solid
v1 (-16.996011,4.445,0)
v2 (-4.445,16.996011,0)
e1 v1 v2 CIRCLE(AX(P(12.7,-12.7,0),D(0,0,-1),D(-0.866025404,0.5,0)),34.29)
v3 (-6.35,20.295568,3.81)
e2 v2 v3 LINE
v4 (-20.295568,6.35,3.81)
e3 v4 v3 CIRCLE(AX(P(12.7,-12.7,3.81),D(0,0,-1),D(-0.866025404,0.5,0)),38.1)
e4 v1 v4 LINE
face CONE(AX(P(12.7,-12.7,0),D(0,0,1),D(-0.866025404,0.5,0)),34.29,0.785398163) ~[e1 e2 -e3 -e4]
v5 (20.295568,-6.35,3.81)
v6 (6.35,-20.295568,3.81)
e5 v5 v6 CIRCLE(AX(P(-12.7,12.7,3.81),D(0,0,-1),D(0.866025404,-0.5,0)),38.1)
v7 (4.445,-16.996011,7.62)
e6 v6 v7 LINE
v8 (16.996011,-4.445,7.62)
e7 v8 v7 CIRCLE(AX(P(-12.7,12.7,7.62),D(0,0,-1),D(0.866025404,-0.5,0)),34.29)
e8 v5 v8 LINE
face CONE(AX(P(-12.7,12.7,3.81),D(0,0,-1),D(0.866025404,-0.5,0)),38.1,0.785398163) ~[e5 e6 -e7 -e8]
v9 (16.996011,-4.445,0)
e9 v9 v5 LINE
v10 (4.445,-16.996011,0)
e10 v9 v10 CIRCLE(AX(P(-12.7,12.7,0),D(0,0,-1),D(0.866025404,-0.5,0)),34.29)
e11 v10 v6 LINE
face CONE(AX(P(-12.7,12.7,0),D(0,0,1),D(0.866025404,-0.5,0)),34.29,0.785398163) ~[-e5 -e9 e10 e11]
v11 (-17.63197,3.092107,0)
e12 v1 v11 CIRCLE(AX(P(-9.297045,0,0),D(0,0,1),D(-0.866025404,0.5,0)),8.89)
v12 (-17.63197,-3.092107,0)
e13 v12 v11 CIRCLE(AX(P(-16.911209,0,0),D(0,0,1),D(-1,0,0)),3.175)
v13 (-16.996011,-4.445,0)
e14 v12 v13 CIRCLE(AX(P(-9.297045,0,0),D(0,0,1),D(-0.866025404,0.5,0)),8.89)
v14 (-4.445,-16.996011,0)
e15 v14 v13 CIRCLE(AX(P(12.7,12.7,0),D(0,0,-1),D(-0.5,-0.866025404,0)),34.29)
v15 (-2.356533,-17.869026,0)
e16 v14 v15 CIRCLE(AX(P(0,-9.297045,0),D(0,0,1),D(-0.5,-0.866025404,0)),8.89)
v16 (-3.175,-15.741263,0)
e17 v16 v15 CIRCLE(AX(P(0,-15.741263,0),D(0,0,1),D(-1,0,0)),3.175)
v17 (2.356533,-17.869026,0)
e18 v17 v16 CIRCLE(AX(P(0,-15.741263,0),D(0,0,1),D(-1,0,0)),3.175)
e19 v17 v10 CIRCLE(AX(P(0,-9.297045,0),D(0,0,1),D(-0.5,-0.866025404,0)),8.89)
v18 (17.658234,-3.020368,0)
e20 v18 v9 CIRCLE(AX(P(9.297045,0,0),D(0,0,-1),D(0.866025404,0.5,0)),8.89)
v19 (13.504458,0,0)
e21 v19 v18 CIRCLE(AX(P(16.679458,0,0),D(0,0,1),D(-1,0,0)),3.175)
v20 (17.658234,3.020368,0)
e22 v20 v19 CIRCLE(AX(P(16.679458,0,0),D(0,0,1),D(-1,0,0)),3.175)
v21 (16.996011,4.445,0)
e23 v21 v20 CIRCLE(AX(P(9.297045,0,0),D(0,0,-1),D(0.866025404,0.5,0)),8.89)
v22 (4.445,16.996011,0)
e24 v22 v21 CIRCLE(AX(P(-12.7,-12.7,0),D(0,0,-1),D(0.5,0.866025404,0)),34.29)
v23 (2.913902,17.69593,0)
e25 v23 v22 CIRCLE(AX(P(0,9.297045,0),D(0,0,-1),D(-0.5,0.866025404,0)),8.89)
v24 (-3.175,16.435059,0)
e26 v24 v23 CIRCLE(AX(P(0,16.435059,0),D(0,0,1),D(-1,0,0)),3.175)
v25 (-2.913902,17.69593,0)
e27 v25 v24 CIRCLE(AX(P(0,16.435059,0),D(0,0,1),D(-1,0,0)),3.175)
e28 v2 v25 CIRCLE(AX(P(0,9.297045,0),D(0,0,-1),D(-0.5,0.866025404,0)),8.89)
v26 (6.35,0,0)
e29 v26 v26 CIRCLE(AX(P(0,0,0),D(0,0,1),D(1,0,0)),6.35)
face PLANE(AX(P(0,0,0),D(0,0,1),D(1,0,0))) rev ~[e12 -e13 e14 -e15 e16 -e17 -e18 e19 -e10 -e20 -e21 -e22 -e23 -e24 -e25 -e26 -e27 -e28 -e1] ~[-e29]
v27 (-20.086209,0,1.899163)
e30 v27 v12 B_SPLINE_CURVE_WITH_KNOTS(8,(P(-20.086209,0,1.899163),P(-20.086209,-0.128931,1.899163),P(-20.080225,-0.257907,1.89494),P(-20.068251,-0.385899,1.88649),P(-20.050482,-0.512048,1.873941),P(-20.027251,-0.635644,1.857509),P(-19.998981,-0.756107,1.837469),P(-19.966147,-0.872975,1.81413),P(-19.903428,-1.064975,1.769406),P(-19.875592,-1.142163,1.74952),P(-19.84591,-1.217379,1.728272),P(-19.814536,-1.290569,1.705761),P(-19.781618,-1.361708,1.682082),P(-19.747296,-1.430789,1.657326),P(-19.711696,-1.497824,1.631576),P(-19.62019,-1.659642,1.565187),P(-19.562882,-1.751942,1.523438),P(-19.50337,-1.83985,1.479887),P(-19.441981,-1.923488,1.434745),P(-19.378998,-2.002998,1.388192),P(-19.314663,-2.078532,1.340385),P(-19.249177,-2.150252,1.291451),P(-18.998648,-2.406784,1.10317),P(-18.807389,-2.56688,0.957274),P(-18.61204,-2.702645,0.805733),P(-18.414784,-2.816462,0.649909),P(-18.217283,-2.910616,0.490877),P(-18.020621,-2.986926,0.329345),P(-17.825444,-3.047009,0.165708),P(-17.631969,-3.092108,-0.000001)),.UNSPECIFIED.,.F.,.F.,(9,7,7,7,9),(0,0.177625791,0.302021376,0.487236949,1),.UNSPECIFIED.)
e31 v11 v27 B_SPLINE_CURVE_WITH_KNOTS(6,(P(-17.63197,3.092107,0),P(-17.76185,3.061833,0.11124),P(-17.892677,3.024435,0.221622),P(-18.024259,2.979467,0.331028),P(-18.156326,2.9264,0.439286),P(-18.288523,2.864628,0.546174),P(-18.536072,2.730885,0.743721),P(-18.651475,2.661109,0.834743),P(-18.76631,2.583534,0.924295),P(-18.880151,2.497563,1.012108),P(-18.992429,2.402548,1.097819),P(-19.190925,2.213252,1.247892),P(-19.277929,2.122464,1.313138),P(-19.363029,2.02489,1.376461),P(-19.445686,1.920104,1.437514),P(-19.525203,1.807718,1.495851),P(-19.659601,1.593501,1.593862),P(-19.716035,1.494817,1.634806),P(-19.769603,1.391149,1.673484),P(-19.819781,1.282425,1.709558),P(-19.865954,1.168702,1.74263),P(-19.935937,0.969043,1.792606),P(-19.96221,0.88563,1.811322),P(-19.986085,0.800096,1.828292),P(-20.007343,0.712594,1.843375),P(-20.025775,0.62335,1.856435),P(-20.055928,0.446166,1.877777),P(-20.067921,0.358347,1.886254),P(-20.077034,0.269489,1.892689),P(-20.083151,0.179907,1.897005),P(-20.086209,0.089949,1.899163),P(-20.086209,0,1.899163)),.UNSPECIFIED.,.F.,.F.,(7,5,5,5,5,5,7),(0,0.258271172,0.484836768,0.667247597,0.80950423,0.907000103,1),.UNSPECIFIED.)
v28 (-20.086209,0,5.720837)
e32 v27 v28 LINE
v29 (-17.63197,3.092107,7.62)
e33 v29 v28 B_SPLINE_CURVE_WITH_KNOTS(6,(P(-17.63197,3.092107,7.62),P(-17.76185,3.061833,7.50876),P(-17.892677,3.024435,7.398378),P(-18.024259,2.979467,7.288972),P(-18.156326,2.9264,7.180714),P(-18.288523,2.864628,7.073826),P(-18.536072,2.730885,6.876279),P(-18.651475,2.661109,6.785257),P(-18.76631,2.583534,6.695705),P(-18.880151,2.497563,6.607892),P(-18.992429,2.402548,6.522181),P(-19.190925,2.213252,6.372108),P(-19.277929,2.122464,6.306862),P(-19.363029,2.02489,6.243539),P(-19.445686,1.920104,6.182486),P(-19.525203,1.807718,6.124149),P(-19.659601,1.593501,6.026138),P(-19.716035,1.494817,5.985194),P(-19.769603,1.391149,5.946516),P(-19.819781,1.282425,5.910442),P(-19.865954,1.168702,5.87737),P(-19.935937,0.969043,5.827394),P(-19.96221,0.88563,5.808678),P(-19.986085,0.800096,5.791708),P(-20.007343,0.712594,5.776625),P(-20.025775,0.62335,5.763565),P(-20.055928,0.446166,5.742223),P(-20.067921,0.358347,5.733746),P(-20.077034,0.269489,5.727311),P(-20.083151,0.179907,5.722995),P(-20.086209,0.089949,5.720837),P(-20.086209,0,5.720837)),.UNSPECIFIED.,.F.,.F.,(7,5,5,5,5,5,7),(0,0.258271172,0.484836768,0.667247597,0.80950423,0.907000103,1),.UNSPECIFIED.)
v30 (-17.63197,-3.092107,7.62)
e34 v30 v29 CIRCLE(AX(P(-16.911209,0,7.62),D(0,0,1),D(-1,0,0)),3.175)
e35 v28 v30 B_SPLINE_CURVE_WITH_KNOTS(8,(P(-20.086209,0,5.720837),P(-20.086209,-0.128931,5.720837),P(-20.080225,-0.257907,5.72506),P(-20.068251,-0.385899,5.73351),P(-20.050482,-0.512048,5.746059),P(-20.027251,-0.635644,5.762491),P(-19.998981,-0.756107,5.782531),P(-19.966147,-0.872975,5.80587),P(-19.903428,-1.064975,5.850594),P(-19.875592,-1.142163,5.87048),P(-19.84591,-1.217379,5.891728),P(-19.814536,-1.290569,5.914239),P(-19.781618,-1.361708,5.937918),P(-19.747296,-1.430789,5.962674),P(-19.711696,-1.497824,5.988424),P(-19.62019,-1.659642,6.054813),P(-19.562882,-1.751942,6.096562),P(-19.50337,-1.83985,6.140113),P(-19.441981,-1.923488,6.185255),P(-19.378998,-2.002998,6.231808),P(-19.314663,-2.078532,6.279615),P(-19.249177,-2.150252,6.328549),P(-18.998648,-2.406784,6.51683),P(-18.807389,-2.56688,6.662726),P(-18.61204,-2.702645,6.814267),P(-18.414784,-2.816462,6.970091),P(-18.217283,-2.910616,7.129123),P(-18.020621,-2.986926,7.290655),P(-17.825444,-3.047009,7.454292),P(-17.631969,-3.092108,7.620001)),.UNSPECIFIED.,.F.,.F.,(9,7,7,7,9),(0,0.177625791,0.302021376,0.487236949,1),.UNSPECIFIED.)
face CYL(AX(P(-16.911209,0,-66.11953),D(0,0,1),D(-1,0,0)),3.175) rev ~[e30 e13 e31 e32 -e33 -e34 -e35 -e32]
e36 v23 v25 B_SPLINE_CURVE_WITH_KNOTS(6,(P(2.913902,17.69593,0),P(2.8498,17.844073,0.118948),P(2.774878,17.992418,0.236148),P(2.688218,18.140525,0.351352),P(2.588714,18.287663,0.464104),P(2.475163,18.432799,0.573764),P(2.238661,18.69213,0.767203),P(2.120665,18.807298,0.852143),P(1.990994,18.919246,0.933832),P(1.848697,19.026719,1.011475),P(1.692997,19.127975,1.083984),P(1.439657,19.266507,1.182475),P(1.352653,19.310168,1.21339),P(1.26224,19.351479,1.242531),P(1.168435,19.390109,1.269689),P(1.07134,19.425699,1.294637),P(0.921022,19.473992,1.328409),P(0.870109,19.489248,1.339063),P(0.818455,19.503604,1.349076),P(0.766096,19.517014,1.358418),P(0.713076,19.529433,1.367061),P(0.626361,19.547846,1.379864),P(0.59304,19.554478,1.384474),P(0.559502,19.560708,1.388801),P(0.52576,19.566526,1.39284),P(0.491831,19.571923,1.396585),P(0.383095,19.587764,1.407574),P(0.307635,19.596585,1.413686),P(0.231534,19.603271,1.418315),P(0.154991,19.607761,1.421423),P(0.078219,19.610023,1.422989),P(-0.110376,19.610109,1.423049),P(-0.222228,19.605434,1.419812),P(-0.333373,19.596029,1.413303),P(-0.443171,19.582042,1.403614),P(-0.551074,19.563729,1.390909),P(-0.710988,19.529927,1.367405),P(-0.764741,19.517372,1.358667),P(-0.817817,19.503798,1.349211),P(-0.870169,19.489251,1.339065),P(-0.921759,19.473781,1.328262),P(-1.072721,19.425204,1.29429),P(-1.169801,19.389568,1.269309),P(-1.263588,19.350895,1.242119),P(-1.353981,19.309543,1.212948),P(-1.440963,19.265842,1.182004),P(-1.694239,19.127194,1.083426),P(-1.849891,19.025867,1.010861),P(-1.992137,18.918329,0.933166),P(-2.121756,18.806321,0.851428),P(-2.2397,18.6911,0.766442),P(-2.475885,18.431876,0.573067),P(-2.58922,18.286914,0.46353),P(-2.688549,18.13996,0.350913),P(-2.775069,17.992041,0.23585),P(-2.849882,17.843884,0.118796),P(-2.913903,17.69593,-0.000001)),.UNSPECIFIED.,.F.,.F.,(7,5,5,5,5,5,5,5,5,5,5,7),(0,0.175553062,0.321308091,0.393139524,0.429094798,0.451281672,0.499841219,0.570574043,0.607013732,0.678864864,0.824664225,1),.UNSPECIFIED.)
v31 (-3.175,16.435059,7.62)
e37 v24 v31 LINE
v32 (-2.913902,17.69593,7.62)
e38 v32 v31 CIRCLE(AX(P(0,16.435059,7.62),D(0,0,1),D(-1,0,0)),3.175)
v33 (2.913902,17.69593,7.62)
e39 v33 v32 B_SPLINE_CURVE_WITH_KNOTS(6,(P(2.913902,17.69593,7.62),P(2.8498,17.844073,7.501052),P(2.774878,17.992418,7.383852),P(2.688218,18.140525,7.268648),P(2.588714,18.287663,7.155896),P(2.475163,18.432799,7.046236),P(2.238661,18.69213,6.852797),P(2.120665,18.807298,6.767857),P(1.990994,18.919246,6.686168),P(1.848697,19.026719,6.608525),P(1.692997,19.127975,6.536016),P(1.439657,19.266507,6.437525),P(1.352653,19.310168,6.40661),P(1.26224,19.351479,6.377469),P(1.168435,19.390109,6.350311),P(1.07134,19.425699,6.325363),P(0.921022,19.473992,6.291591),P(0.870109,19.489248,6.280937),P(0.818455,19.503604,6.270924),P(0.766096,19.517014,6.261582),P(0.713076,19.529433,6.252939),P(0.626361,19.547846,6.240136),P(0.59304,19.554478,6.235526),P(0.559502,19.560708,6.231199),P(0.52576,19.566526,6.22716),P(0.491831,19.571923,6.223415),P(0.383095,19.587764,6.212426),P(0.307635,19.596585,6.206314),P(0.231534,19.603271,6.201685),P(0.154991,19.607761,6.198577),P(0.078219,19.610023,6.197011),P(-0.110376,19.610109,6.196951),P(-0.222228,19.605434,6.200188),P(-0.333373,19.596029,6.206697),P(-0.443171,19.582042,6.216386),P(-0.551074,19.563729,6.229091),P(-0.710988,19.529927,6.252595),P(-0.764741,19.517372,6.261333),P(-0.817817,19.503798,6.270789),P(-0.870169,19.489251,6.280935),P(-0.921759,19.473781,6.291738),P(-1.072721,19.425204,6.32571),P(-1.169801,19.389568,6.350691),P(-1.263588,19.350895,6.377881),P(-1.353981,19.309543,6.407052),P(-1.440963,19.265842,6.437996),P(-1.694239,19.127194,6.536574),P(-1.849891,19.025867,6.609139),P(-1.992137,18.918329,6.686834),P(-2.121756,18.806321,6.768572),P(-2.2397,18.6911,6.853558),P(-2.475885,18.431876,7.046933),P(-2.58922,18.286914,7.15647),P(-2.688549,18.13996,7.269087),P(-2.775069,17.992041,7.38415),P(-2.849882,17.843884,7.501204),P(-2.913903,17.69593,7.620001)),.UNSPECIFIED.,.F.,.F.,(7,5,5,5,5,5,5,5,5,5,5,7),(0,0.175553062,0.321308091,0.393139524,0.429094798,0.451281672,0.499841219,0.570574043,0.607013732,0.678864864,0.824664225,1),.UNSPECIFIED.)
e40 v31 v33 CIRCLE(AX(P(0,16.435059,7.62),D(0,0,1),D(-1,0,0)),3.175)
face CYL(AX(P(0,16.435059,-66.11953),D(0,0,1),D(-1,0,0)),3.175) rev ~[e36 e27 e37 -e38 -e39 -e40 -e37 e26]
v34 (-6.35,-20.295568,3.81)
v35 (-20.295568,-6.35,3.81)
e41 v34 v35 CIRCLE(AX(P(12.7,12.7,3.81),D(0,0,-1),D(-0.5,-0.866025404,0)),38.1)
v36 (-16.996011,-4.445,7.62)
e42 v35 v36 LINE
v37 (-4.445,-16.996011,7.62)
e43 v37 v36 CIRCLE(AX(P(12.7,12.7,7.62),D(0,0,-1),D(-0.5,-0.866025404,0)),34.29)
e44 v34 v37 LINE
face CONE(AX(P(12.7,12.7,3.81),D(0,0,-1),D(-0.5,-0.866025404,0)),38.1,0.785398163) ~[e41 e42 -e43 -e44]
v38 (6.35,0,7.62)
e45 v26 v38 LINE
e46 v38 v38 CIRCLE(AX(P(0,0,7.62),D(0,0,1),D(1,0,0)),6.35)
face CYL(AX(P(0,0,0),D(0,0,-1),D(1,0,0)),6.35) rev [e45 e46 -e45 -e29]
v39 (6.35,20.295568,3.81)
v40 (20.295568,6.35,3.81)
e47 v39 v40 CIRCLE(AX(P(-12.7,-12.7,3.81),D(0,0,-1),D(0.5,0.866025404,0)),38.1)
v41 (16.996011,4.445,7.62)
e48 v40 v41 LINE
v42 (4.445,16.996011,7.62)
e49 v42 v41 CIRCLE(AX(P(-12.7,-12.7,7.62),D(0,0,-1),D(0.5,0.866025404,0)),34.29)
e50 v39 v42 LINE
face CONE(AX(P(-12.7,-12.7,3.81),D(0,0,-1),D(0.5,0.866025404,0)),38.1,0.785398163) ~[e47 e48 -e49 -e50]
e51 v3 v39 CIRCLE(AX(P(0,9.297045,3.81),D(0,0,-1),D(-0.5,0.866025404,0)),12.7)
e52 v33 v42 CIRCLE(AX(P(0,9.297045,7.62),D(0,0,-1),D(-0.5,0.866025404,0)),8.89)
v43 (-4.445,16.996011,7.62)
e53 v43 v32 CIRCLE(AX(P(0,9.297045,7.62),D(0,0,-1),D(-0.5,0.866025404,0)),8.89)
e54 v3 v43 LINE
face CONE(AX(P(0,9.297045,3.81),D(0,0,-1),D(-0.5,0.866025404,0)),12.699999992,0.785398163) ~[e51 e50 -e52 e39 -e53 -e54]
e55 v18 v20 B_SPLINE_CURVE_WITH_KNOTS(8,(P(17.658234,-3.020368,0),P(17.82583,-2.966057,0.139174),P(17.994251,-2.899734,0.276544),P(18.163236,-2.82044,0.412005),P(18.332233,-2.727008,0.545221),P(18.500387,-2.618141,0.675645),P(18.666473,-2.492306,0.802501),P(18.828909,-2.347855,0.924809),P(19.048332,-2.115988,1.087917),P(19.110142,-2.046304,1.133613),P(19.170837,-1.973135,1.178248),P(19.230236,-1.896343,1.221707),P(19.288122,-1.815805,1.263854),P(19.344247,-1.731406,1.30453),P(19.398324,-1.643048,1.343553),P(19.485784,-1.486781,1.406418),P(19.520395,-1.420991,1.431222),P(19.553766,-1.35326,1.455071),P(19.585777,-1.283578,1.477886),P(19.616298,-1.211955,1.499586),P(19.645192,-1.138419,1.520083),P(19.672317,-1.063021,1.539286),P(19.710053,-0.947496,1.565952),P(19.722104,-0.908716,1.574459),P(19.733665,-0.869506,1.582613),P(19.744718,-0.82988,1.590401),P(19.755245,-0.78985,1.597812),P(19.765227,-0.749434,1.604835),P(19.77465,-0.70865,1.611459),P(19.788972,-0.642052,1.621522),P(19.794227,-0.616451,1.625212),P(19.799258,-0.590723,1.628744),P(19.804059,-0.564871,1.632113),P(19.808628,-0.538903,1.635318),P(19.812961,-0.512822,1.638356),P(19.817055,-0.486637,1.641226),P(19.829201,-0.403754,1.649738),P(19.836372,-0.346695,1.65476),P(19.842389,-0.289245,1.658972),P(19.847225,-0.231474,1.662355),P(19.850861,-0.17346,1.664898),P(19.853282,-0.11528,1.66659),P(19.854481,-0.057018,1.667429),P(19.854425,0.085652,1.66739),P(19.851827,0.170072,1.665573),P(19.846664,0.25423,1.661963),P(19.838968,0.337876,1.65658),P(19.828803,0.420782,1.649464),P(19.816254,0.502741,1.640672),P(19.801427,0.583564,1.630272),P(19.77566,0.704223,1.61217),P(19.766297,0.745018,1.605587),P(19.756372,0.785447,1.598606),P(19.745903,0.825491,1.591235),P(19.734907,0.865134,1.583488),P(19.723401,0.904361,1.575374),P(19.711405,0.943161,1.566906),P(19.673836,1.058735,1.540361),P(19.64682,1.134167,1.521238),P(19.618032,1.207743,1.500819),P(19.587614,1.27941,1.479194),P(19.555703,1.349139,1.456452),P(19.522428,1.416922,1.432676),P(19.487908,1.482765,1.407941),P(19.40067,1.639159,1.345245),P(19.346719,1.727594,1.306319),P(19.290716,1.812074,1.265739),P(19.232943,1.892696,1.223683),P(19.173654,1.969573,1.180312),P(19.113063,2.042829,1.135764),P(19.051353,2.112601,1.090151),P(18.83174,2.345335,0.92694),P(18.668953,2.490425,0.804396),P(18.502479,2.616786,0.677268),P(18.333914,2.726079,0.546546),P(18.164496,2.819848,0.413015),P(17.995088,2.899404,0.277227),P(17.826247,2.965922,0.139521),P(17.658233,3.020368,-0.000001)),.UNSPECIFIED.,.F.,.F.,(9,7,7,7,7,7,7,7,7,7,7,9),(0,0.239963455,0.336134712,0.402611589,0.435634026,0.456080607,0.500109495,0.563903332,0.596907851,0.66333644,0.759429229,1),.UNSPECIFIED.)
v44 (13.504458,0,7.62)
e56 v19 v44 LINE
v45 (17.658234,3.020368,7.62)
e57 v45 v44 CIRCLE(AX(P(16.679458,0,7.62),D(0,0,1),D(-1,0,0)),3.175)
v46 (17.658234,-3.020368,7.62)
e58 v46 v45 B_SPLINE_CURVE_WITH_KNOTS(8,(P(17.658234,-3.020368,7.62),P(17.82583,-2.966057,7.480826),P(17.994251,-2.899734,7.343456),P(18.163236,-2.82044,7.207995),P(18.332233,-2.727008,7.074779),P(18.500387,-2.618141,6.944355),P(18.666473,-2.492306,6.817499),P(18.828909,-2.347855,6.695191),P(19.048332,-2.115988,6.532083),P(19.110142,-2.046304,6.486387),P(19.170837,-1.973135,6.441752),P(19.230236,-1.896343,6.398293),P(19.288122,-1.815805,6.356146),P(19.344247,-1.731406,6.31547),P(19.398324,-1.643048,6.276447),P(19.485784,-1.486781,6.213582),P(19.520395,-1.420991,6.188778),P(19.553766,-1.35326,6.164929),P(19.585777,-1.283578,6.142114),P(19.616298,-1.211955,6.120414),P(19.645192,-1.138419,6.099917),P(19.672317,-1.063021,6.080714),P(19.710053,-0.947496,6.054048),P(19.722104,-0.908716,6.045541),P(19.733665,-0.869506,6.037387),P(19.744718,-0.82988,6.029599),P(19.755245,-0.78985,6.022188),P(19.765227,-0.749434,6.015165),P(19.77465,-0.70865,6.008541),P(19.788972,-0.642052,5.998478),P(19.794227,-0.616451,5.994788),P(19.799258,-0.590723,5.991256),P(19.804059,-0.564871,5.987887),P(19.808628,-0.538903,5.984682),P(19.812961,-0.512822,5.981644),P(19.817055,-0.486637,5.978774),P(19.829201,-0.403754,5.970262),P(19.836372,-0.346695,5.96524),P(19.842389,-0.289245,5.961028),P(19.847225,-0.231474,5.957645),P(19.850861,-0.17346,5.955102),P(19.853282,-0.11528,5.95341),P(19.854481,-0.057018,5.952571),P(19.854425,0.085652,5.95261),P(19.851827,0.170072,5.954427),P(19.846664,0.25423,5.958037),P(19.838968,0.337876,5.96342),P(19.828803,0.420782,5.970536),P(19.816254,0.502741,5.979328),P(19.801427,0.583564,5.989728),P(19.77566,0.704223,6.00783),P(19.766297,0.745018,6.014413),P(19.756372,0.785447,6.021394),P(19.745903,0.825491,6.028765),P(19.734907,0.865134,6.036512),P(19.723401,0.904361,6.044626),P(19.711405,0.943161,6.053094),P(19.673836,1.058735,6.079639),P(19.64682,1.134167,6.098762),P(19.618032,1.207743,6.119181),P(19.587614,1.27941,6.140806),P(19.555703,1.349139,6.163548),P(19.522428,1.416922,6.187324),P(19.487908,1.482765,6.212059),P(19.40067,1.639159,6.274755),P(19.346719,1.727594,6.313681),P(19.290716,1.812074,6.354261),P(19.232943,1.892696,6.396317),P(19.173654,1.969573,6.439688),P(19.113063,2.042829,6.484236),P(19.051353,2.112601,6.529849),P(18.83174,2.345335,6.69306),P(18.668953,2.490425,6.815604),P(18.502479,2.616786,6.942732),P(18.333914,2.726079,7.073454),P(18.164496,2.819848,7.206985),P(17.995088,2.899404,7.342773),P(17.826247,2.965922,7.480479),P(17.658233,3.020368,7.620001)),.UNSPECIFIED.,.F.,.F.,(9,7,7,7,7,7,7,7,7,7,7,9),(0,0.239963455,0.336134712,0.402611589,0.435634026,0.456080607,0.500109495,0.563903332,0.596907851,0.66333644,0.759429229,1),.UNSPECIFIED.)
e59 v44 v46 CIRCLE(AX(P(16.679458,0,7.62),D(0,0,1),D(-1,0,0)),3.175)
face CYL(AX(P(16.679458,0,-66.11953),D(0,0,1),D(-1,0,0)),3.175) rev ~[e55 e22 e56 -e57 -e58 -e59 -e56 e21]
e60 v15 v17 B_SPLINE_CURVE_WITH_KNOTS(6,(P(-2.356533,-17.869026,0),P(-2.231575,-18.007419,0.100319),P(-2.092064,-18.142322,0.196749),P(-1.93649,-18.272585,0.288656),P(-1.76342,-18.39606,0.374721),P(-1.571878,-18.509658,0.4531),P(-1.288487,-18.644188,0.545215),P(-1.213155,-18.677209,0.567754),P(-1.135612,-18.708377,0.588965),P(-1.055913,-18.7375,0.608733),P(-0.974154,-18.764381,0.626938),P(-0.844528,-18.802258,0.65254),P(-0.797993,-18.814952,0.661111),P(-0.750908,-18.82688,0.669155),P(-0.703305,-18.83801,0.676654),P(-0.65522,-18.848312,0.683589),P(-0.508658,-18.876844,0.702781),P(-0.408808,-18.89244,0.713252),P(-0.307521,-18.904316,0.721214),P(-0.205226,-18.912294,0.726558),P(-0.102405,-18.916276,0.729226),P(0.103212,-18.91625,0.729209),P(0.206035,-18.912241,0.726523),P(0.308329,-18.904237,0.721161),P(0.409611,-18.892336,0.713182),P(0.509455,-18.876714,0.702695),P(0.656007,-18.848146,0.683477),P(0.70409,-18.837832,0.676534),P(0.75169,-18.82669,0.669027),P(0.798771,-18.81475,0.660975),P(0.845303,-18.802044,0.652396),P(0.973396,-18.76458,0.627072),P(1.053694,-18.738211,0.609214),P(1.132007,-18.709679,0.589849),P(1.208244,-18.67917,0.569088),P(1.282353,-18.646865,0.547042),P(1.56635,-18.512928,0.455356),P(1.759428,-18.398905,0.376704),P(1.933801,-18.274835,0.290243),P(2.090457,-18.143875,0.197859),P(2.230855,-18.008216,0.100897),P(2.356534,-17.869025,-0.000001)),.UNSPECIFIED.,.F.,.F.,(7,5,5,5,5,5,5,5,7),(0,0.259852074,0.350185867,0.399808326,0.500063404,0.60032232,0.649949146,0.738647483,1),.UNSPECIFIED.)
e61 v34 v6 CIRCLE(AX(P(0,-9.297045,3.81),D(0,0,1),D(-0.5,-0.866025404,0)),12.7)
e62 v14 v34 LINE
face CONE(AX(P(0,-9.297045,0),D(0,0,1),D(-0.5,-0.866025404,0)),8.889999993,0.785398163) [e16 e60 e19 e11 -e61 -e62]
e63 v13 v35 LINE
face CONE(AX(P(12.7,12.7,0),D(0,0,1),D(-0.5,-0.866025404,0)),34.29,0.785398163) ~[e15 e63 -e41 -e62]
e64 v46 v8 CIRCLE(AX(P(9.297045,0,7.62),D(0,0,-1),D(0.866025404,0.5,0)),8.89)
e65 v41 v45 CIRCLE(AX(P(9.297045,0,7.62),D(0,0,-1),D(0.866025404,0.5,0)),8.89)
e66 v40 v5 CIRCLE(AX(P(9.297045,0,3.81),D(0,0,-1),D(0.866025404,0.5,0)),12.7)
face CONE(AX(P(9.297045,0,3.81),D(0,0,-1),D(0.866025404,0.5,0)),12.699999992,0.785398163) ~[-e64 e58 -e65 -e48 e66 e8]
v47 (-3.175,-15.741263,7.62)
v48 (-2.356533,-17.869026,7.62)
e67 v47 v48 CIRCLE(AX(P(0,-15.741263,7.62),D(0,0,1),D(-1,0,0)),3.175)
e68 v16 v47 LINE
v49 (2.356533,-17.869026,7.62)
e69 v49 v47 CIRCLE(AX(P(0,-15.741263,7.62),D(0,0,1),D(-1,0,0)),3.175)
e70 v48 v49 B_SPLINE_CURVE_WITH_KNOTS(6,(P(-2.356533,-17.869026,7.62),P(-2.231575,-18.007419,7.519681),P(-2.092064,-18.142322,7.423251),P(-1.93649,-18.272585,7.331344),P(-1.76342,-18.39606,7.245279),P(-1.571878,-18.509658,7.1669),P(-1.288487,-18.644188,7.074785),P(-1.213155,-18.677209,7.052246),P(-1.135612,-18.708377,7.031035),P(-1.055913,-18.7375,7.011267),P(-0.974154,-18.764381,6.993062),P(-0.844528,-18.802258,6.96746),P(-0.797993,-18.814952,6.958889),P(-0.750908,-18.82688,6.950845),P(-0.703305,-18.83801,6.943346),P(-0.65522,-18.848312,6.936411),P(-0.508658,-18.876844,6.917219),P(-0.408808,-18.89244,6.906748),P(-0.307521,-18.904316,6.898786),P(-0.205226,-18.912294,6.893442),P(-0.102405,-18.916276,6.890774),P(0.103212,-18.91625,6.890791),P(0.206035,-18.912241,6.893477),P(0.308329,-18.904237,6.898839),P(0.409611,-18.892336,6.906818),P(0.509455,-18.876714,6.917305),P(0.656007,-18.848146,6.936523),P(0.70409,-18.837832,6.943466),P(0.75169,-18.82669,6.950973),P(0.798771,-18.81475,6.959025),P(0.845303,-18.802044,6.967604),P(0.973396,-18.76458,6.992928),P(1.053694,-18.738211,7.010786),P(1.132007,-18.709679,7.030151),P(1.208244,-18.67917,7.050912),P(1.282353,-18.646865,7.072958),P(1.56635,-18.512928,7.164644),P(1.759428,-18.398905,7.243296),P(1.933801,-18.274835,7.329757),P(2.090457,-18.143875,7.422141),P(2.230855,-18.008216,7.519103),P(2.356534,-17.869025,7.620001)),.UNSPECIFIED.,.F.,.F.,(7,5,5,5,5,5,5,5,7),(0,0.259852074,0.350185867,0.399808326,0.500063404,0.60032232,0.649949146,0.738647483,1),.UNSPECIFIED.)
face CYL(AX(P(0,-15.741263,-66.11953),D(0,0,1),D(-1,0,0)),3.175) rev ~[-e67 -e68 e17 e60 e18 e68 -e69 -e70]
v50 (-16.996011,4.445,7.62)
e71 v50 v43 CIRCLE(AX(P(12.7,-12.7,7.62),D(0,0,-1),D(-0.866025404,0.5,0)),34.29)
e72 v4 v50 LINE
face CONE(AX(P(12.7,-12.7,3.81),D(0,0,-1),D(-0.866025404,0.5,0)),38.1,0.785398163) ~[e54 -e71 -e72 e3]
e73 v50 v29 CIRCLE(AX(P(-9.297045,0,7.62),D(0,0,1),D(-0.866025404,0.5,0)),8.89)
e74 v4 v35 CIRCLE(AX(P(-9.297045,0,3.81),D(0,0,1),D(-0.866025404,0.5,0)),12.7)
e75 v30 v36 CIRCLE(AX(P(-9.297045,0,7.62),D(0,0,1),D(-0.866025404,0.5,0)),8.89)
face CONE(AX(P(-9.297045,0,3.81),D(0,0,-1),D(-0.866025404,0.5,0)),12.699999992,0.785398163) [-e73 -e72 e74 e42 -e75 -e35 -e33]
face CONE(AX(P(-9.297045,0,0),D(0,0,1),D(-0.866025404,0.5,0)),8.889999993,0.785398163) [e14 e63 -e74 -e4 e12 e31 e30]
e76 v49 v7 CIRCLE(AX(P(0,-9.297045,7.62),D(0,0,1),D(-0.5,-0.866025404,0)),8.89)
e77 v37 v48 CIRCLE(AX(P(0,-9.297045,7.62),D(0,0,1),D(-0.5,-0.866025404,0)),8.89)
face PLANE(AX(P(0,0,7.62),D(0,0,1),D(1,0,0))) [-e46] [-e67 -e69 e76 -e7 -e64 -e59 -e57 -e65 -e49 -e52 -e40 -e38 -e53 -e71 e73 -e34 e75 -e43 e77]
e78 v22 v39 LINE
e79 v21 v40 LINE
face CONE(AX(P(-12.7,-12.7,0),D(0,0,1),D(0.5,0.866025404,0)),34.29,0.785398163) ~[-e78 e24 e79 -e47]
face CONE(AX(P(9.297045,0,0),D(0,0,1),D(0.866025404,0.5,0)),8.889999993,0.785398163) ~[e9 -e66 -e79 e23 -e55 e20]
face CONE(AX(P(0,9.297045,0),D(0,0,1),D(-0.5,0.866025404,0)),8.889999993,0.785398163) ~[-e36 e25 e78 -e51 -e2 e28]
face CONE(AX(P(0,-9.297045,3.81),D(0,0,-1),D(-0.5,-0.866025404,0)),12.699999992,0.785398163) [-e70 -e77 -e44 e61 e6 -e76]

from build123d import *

# Parameters (mm, degrees)
F0_W         = 50.8
F0_H         = 50.8
F0_R         = 6.35
F1_DEPTH     = 7.62
F2_T1_DEPTH  = 198.12
F4_D         = 6.35
F5_R         = 12.7
F6_T2_ANGLE  = 29.9999999999
F6_T4_ANGLE  = 29.9999999999
F6_T6_ANGLE  = 60.000000035
F6_T8_ANGLE  = 60.000000035
F6_T10_ANGLE = 29.9999999999
F6_T12_ANGLE = 60.000000035
F6_T14_ANGLE = 29.9999999999
F6_T16_ANGLE = 60.000000035
F6_T18_ANGLE = 29.9999999999
F6_T20_ANGLE = 60.000000035
F6_T22_ANGLE = 60.000000035
F6_T24_ANGLE = 29.9999999999
F6_T26_ANGLE = 60.000000035
F6_T28_ANGLE = 29.9999999999
F6_T30_ANGLE = 60.000000035
F6_T32_ANGLE = 29.9999999999


# Not quite as in the source:
# - a fillet or chamfer that OpenCascade refuses, or shapes differently, is made with other operations: its cross-section is extruded or revolved along the edge and cut away or added


with BuildPart() as f1:
    # F0 (on Top) → F1 (new body)
    with BuildSketch(Plane.XY):
        Rectangle(F0_W, F0_H)
        Circle(F0_R, mode=Mode.SUBTRACT)
    extrude(amount=F1_DEPTH)

    # F2: fillet of radius 38.1 on 4 edges, made by hand

    # F2_s2 → F2_t1 (cut)
    with BuildSketch(Plane.XY.offset(-95.25)):
        with BuildLine():
            ThreePointArc((25.4, 12.7), (14.2407683632, -14.2407683632), (-12.7, -25.4))
            Line((-12.7, -25.4), (25.4, -25.4))
            Line((25.4, -25.4), (25.4, 12.7))
        make_face()
        with BuildLine():
            ThreePointArc((-25.4, 12.7), (-14.2407683632, -14.2407683632), (12.7, -25.4))
            Line((12.7, -25.4), (-25.4, -25.4))
            Line((-25.4, -25.4), (-25.4, 12.7))
        make_face()
        with BuildLine():
            ThreePointArc((12.7, 25.4), (-14.2407683632, 14.2407683632), (-25.4, -12.7))
            Line((-25.4, -12.7), (-25.4, 25.4))
            Line((-25.4, 25.4), (12.7, 25.4))
        make_face()
        with BuildLine():
            ThreePointArc((25.4, -12.7), (14.2407683632, 14.2407683632), (-12.7, 25.4))
            Line((-12.7, 25.4), (25.4, 25.4))
            Line((25.4, 25.4), (25.4, -12.7))
        make_face()
    extrude(amount=F2_T1_DEPTH, mode=Mode.SUBTRACT)

    # F4 (through all)
    with Locations(Plane(origin=(0, 0, 0), x_dir=(1, 0, 0), z_dir=(0, 0, -1))):
        with Locations((0, -16.4350587875), (-16.9112086296, 0), (0, 15.7412625849), (16.6794583201, 0)):
            Hole(F4_D / 2)

    # F5
    f5_edges = [f1.edges().sort_by_distance(p)[0] for p in [
        (0, -23.221024, 3.81),
        (23.221024, 0, 3.81),
        (-23.221024, 0, 3.81),
        (0, 23.221024, 3.81),
    ]]
    fillet(f5_edges, radius=F5_R)

    # F6: chamfer of 3.81 on 2 edges, made by hand

    # F6_s1 → F6_t2 (revolve, cut)
    with BuildSketch(Plane(origin=(2.324261314, 4.025738686, 0), x_dir=(0, 0, 1), z_dir=(0.5, 0.8660254038, 0))):
        Polygon((3.81, 20.7514773719), (7.62, 16.9414773719), (7.62, 20.7514773719), align=None)
    revolve(axis=Axis((-12.7, 12.7, 7.62), (0, 0, -1)), revolution_arc=F6_T2_ANGLE, mode=Mode.SUBTRACT)

    # F6_s3 → F6_t4 (revolve, cut)
    with BuildSketch(Plane(origin=(2.324261314, 4.025738686, 0), x_dir=(0, 0, 1), z_dir=(0.5, 0.8660254038, 0))):
        Polygon((0, 16.9414773719), (3.81, 20.7514773719), (0, 20.7514773719), align=None)
    revolve(axis=Axis((-12.7, 12.7, 0), (0, 0, -1)), revolution_arc=F6_T4_ANGLE, mode=Mode.SUBTRACT)

    # F6_s5 → F6_t6 (revolve, cut)
    with BuildSketch(Plane(origin=(2.324261317, -4.0257386892, 0), x_dir=(0, 0, 1), z_dir=(-0.5000000002, 0.8660254037, 0))):
        Polygon((0, 16.941477371), (3.81, 20.7514773707), (0, 20.751477371), align=None)
    revolve(axis=Axis((9.2970452639, 1.5e-09, 0), (0, 0, -1)), revolution_arc=F6_T6_ANGLE, mode=Mode.SUBTRACT)

    # F6_s7 → F6_t8 (revolve, cut)
    with BuildSketch(Plane(origin=(4.0257386892, -2.324261317, 0), x_dir=(0, 0, 1), z_dir=(-0.8660254037, 0.5000000002, 0))):
        Polygon((0, -16.941477371), (3.81, -20.7514773707), (0, -20.751477371), align=None)
    revolve(axis=Axis((-1.5e-09, -9.2970452639, 0), (0, 0, 1)), revolution_arc=F6_T8_ANGLE, mode=Mode.SUBTRACT)

    # F6_s9 → F6_t10 (revolve, cut)
    with BuildSketch(Plane(origin=(4.025738686, -2.324261314, 0), x_dir=(0, 0, 1), z_dir=(0.8660254038, -0.5, 0))):
        Polygon((0, 16.9414773719), (3.81, 20.7514773719), (0, 20.7514773719), align=None)
    revolve(axis=Axis((12.7, 12.7, 0), (0, 0, -1)), revolution_arc=F6_T10_ANGLE, mode=Mode.SUBTRACT)

    # F6_s11 → F6_t12 (revolve, cut)
    with BuildSketch(Plane(origin=(-2.324261317, -4.0257386892, 0), x_dir=(0, 0, 1), z_dir=(0.5000000002, 0.8660254037, 0))):
        Polygon((0, -16.941477371), (3.81, -20.7514773707), (0, -20.751477371), align=None)
    revolve(axis=Axis((-9.2970452639, 1.5e-09, 0), (0, 0, 1)), revolution_arc=F6_T12_ANGLE, mode=Mode.SUBTRACT)

    # F6_s13 → F6_t14 (revolve, cut)
    with BuildSketch(Plane(origin=(-2.324261314, -4.025738686, 0), x_dir=(0, 0, 1), z_dir=(-0.5, -0.8660254038, 0))):
        Polygon((0, 16.9414773719), (3.81, 20.7514773719), (0, 20.7514773719), align=None)
    revolve(axis=Axis((12.7, -12.7, 0), (0, 0, -1)), revolution_arc=F6_T14_ANGLE, mode=Mode.SUBTRACT)

    # F6_s15 → F6_t16 (revolve, cut)
    with BuildSketch(Plane(origin=(4.0257386892, 2.324261317, 0), x_dir=(0, 0, 1), z_dir=(-0.8660254037, -0.5000000002, 0))):
        Polygon((0, 16.941477371), (3.81, 20.7514773707), (0, 20.751477371), align=None)
    revolve(axis=Axis((-1.5e-09, 9.2970452639, 0), (0, 0, -1)), revolution_arc=F6_T16_ANGLE, mode=Mode.SUBTRACT)

    # F6_s17 → F6_t18 (revolve, cut)
    with BuildSketch(Plane(origin=(-4.025738686, 2.324261314, 0), x_dir=(0, 0, 1), z_dir=(-0.8660254038, 0.5, 0))):
        Polygon((0, 16.9414773719), (3.81, 20.7514773719), (0, 20.7514773719), align=None)
    revolve(axis=Axis((-12.7, -12.7, 0), (0, 0, -1)), revolution_arc=F6_T18_ANGLE, mode=Mode.SUBTRACT)

    # F6_s19 → F6_t20 (revolve, cut)
    with BuildSketch(Plane(origin=(2.324261317, -4.0257386892, 0), x_dir=(0, 0, 1), z_dir=(-0.5000000002, 0.8660254037, 0))):
        Polygon((3.81, 20.7514773707), (7.62, 16.941477371), (7.62, 20.751477371), align=None)
    revolve(axis=Axis((9.2970452639, 1.5e-09, 7.62), (0, 0, -1)), revolution_arc=F6_T20_ANGLE, mode=Mode.SUBTRACT)

    # F6_s21 → F6_t22 (revolve, cut)
    with BuildSketch(Plane(origin=(4.0257386892, -2.324261317, 0), x_dir=(0, 0, 1), z_dir=(-0.8660254037, 0.5000000002, 0))):
        Polygon((3.81, -20.7514773707), (7.62, -16.941477371), (7.62, -20.751477371), align=None)
    revolve(axis=Axis((-1.5e-09, -9.2970452639, 7.62), (0, 0, 1)), revolution_arc=F6_T22_ANGLE, mode=Mode.SUBTRACT)

    # F6_s23 → F6_t24 (revolve, cut)
    with BuildSketch(Plane(origin=(4.025738686, -2.324261314, 0), x_dir=(0, 0, 1), z_dir=(0.8660254038, -0.5, 0))):
        Polygon((3.81, 20.7514773719), (7.62, 16.9414773719), (7.62, 20.7514773719), align=None)
    revolve(axis=Axis((12.7, 12.7, 7.62), (0, 0, -1)), revolution_arc=F6_T24_ANGLE, mode=Mode.SUBTRACT)

    # F6_s25 → F6_t26 (revolve, cut)
    with BuildSketch(Plane(origin=(-2.324261317, -4.0257386892, 0), x_dir=(0, 0, 1), z_dir=(0.5000000002, 0.8660254037, 0))):
        Polygon((3.81, -20.7514773707), (7.62, -16.941477371), (7.62, -20.751477371), align=None)
    revolve(axis=Axis((-9.2970452639, 1.5e-09, 7.62), (0, 0, 1)), revolution_arc=F6_T26_ANGLE, mode=Mode.SUBTRACT)

    # F6_s27 → F6_t28 (revolve, cut)
    with BuildSketch(Plane(origin=(-2.324261314, -4.025738686, 0), x_dir=(0, 0, 1), z_dir=(-0.5, -0.8660254038, 0))):
        Polygon((3.81, 20.7514773719), (7.62, 16.9414773719), (7.62, 20.7514773719), align=None)
    revolve(axis=Axis((12.7, -12.7, 7.62), (0, 0, -1)), revolution_arc=F6_T28_ANGLE, mode=Mode.SUBTRACT)

    # F6_s29 → F6_t30 (revolve, cut)
    with BuildSketch(Plane(origin=(4.0257386892, 2.324261317, 0), x_dir=(0, 0, 1), z_dir=(-0.8660254037, -0.5000000002, 0))):
        Polygon((3.81, 20.7514773707), (7.62, 16.941477371), (7.62, 20.751477371), align=None)
    revolve(axis=Axis((-1.5e-09, 9.2970452639, 7.62), (0, 0, -1)), revolution_arc=F6_T30_ANGLE, mode=Mode.SUBTRACT)

    # F6_s31 → F6_t32 (revolve, cut)
    with BuildSketch(Plane(origin=(-4.025738686, 2.324261314, 0), x_dir=(0, 0, 1), z_dir=(-0.8660254038, 0.5, 0))):
        Polygon((3.81, 20.7514773719), (7.62, 16.9414773719), (7.62, 20.7514773719), align=None)
    revolve(axis=Axis((-12.7, -12.7, 7.62), (0, 0, -1)), revolution_arc=F6_T32_ANGLE, mode=Mode.SUBTRACT)


solid = f1.part
